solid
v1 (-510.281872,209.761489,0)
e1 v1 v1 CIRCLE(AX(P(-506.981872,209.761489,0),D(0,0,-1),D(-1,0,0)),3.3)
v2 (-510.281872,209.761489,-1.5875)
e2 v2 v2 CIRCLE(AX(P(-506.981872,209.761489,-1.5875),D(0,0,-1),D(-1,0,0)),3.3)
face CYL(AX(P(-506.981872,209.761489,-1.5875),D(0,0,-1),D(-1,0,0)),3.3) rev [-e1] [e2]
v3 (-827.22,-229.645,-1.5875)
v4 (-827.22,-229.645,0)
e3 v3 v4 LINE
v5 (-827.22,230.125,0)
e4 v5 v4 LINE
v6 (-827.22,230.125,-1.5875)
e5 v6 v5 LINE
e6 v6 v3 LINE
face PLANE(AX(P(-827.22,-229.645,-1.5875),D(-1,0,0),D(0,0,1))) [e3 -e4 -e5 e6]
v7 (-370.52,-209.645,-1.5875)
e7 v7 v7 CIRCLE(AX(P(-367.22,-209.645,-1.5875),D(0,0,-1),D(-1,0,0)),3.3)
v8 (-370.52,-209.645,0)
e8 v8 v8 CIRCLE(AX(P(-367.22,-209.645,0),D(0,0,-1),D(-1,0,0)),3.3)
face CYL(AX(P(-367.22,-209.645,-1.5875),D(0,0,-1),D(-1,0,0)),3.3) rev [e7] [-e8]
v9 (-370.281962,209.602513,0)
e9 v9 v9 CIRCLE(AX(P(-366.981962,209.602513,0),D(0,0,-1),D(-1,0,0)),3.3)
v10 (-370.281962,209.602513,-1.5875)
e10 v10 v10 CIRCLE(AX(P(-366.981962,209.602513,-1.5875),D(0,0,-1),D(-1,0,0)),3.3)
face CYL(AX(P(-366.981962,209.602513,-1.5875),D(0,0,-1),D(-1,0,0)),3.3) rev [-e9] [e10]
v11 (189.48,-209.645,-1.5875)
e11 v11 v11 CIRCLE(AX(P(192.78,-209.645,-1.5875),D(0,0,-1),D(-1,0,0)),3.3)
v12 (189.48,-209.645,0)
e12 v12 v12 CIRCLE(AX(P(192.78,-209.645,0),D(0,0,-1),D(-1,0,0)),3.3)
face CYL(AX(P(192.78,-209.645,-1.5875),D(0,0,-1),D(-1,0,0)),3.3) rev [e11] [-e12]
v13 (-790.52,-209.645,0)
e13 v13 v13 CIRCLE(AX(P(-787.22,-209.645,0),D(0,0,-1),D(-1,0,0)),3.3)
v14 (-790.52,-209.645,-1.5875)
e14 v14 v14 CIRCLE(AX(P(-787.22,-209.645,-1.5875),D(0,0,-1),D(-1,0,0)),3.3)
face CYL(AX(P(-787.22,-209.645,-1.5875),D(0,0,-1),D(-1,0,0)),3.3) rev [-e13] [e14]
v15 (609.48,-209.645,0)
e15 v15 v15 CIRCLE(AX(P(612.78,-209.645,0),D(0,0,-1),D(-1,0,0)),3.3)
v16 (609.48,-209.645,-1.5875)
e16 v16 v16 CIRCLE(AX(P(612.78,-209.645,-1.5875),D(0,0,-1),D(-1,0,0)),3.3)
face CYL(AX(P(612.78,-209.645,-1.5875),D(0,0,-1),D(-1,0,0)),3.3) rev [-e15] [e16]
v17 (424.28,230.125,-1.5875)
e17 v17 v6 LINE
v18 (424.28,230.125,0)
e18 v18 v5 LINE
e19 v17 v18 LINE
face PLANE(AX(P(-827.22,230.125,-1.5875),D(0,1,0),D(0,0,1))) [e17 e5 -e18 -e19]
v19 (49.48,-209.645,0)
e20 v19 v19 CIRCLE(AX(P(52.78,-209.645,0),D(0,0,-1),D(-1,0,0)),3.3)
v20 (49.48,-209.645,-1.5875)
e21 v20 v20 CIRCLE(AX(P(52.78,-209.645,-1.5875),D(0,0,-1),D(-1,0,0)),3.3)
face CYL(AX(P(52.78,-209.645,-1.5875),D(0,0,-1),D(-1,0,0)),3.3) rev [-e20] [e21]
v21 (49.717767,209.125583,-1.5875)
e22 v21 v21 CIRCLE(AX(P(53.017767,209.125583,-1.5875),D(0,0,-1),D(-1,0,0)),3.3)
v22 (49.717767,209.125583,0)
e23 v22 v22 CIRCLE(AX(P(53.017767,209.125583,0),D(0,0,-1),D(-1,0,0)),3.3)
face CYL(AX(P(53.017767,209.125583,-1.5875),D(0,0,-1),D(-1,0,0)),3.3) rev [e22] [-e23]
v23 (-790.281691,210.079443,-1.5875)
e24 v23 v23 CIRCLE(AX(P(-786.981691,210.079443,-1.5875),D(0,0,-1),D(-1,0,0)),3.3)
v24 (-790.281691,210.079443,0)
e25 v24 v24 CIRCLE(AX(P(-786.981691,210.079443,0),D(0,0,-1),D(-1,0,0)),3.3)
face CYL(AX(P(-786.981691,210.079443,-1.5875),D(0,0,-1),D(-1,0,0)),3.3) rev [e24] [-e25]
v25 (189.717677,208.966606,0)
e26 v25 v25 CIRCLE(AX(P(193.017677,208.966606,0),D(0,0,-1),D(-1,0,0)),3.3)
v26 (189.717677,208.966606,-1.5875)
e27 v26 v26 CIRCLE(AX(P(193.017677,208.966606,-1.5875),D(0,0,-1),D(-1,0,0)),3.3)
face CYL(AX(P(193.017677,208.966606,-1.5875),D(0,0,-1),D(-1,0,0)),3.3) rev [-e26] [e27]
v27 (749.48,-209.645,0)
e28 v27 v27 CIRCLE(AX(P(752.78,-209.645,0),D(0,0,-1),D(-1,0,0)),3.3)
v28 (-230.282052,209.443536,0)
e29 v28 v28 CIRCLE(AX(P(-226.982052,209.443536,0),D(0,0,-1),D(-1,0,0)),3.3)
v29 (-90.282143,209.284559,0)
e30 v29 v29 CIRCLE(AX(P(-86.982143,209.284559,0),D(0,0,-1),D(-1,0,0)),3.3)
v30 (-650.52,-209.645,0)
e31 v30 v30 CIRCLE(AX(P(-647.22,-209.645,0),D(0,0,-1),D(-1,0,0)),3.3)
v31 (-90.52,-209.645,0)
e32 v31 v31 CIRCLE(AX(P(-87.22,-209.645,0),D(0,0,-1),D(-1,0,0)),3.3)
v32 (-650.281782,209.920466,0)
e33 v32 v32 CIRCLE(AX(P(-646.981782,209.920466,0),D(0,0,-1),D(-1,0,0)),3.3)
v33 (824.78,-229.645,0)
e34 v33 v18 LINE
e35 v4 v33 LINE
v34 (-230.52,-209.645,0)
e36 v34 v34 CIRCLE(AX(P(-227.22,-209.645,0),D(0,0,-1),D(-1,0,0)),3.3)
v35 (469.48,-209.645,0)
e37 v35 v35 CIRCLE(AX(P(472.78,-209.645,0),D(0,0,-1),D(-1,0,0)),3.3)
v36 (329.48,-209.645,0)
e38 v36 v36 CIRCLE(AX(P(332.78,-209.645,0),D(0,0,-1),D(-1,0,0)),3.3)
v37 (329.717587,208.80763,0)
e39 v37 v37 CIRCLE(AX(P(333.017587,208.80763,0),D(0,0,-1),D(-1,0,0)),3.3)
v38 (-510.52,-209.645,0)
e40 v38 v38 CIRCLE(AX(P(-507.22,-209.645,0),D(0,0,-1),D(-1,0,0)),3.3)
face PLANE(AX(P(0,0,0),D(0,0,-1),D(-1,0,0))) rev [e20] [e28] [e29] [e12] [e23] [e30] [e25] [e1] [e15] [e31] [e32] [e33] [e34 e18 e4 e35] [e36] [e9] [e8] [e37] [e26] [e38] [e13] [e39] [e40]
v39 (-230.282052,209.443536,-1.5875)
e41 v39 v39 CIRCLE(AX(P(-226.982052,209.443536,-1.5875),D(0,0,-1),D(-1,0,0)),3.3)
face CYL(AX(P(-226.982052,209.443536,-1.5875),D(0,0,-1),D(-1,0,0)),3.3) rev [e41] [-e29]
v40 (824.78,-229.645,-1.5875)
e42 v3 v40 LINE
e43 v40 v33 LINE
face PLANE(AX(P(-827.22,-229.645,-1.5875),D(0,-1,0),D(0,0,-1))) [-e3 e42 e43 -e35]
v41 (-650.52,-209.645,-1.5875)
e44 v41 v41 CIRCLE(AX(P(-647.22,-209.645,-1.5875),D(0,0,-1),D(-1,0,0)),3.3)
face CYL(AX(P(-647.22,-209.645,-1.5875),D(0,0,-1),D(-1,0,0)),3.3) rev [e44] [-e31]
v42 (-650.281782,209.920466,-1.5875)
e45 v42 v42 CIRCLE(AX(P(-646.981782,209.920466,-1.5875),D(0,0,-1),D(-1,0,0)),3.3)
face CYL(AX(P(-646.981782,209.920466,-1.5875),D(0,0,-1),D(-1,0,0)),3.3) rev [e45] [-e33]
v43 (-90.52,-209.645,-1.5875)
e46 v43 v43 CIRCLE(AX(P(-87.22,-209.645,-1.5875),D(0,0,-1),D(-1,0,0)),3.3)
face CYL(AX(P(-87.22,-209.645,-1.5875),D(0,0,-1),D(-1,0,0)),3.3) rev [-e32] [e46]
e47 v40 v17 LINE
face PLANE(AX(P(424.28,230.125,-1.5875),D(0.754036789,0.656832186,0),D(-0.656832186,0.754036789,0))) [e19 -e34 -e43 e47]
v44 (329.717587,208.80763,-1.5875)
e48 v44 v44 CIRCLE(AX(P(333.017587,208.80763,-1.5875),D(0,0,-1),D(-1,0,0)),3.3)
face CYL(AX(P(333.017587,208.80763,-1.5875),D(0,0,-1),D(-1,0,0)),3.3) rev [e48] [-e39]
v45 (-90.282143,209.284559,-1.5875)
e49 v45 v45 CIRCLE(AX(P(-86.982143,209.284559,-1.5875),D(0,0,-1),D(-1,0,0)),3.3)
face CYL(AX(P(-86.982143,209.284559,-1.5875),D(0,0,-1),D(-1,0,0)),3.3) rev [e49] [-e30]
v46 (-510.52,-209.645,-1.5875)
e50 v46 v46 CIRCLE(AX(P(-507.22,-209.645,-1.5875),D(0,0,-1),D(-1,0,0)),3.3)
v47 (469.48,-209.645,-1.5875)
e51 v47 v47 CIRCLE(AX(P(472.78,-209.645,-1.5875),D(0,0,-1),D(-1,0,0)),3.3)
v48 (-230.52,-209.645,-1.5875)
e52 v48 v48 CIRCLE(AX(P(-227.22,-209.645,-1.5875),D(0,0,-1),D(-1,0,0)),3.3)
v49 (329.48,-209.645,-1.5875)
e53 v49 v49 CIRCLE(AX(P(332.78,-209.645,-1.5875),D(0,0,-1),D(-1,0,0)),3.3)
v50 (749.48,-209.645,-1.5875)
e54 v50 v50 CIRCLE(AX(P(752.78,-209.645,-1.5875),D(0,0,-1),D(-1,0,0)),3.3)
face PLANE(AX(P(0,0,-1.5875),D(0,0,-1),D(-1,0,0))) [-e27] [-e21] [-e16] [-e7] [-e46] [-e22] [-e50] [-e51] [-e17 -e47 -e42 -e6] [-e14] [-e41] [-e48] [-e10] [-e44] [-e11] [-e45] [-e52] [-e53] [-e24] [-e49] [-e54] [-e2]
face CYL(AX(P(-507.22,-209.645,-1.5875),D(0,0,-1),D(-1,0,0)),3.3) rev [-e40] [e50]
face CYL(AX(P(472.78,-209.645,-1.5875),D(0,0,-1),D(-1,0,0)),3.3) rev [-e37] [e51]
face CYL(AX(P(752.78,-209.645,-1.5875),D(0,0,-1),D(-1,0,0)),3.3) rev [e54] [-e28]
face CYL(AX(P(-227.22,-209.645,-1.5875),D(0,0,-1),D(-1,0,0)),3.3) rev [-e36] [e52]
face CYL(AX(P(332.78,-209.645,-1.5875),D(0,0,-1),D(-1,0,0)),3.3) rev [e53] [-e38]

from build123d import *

# Parameters (mm, degrees)
BRIDA_BASE1_DEPTH            = 1.5875
TALADRO_DE_MARGEN_PARA_M62_D = 6.6


# Sheet-metal steps are written as plain solids
with BuildPart() as part:
    # Croquis1 → Brida base1 (new body)
    with BuildSketch(Plane.XY):
        Polygon((424.28, 230.125), (824.78, -229.645), (-827.22, -229.645), (-827.22, 230.125), align=None)
    extrude(amount=-BRIDA_BASE1_DEPTH)

    # Taladro de margen para M62 (through all)
    with Locations(Plane(origin=(0, 0, -1.5875), x_dir=(-1, 0, 0), z_dir=(0, 0, -1))):
        with Locations((787.22, -209.645), (647.22, -209.645), (507.22, -209.645), (367.22, -209.645), (227.22, -209.645), (87.22, -209.645), (-52.78, -209.645), (-192.78, -209.645), (-332.78, -209.645), (-472.78, -209.645), (-612.78, -209.645), (-752.78, -209.645), (-753.017315716, 208.330699563), (-613.017405979, 208.489676218), (-473.017496241, 208.648652874), (-333.017586504, 208.80762953), (-193.017676767, 208.966606186), (-53.01776703, 209.125582842), (86.982142707, 209.284559498), (226.982052445, 209.443536154), (366.981962182, 209.60251281), (506.981871919, 209.761489466), (646.981781656, 209.920466122), (786.981691393, 210.079442778)):
            Hole(TALADRO_DE_MARGEN_PARA_M62_D / 2)


solid = part.part
